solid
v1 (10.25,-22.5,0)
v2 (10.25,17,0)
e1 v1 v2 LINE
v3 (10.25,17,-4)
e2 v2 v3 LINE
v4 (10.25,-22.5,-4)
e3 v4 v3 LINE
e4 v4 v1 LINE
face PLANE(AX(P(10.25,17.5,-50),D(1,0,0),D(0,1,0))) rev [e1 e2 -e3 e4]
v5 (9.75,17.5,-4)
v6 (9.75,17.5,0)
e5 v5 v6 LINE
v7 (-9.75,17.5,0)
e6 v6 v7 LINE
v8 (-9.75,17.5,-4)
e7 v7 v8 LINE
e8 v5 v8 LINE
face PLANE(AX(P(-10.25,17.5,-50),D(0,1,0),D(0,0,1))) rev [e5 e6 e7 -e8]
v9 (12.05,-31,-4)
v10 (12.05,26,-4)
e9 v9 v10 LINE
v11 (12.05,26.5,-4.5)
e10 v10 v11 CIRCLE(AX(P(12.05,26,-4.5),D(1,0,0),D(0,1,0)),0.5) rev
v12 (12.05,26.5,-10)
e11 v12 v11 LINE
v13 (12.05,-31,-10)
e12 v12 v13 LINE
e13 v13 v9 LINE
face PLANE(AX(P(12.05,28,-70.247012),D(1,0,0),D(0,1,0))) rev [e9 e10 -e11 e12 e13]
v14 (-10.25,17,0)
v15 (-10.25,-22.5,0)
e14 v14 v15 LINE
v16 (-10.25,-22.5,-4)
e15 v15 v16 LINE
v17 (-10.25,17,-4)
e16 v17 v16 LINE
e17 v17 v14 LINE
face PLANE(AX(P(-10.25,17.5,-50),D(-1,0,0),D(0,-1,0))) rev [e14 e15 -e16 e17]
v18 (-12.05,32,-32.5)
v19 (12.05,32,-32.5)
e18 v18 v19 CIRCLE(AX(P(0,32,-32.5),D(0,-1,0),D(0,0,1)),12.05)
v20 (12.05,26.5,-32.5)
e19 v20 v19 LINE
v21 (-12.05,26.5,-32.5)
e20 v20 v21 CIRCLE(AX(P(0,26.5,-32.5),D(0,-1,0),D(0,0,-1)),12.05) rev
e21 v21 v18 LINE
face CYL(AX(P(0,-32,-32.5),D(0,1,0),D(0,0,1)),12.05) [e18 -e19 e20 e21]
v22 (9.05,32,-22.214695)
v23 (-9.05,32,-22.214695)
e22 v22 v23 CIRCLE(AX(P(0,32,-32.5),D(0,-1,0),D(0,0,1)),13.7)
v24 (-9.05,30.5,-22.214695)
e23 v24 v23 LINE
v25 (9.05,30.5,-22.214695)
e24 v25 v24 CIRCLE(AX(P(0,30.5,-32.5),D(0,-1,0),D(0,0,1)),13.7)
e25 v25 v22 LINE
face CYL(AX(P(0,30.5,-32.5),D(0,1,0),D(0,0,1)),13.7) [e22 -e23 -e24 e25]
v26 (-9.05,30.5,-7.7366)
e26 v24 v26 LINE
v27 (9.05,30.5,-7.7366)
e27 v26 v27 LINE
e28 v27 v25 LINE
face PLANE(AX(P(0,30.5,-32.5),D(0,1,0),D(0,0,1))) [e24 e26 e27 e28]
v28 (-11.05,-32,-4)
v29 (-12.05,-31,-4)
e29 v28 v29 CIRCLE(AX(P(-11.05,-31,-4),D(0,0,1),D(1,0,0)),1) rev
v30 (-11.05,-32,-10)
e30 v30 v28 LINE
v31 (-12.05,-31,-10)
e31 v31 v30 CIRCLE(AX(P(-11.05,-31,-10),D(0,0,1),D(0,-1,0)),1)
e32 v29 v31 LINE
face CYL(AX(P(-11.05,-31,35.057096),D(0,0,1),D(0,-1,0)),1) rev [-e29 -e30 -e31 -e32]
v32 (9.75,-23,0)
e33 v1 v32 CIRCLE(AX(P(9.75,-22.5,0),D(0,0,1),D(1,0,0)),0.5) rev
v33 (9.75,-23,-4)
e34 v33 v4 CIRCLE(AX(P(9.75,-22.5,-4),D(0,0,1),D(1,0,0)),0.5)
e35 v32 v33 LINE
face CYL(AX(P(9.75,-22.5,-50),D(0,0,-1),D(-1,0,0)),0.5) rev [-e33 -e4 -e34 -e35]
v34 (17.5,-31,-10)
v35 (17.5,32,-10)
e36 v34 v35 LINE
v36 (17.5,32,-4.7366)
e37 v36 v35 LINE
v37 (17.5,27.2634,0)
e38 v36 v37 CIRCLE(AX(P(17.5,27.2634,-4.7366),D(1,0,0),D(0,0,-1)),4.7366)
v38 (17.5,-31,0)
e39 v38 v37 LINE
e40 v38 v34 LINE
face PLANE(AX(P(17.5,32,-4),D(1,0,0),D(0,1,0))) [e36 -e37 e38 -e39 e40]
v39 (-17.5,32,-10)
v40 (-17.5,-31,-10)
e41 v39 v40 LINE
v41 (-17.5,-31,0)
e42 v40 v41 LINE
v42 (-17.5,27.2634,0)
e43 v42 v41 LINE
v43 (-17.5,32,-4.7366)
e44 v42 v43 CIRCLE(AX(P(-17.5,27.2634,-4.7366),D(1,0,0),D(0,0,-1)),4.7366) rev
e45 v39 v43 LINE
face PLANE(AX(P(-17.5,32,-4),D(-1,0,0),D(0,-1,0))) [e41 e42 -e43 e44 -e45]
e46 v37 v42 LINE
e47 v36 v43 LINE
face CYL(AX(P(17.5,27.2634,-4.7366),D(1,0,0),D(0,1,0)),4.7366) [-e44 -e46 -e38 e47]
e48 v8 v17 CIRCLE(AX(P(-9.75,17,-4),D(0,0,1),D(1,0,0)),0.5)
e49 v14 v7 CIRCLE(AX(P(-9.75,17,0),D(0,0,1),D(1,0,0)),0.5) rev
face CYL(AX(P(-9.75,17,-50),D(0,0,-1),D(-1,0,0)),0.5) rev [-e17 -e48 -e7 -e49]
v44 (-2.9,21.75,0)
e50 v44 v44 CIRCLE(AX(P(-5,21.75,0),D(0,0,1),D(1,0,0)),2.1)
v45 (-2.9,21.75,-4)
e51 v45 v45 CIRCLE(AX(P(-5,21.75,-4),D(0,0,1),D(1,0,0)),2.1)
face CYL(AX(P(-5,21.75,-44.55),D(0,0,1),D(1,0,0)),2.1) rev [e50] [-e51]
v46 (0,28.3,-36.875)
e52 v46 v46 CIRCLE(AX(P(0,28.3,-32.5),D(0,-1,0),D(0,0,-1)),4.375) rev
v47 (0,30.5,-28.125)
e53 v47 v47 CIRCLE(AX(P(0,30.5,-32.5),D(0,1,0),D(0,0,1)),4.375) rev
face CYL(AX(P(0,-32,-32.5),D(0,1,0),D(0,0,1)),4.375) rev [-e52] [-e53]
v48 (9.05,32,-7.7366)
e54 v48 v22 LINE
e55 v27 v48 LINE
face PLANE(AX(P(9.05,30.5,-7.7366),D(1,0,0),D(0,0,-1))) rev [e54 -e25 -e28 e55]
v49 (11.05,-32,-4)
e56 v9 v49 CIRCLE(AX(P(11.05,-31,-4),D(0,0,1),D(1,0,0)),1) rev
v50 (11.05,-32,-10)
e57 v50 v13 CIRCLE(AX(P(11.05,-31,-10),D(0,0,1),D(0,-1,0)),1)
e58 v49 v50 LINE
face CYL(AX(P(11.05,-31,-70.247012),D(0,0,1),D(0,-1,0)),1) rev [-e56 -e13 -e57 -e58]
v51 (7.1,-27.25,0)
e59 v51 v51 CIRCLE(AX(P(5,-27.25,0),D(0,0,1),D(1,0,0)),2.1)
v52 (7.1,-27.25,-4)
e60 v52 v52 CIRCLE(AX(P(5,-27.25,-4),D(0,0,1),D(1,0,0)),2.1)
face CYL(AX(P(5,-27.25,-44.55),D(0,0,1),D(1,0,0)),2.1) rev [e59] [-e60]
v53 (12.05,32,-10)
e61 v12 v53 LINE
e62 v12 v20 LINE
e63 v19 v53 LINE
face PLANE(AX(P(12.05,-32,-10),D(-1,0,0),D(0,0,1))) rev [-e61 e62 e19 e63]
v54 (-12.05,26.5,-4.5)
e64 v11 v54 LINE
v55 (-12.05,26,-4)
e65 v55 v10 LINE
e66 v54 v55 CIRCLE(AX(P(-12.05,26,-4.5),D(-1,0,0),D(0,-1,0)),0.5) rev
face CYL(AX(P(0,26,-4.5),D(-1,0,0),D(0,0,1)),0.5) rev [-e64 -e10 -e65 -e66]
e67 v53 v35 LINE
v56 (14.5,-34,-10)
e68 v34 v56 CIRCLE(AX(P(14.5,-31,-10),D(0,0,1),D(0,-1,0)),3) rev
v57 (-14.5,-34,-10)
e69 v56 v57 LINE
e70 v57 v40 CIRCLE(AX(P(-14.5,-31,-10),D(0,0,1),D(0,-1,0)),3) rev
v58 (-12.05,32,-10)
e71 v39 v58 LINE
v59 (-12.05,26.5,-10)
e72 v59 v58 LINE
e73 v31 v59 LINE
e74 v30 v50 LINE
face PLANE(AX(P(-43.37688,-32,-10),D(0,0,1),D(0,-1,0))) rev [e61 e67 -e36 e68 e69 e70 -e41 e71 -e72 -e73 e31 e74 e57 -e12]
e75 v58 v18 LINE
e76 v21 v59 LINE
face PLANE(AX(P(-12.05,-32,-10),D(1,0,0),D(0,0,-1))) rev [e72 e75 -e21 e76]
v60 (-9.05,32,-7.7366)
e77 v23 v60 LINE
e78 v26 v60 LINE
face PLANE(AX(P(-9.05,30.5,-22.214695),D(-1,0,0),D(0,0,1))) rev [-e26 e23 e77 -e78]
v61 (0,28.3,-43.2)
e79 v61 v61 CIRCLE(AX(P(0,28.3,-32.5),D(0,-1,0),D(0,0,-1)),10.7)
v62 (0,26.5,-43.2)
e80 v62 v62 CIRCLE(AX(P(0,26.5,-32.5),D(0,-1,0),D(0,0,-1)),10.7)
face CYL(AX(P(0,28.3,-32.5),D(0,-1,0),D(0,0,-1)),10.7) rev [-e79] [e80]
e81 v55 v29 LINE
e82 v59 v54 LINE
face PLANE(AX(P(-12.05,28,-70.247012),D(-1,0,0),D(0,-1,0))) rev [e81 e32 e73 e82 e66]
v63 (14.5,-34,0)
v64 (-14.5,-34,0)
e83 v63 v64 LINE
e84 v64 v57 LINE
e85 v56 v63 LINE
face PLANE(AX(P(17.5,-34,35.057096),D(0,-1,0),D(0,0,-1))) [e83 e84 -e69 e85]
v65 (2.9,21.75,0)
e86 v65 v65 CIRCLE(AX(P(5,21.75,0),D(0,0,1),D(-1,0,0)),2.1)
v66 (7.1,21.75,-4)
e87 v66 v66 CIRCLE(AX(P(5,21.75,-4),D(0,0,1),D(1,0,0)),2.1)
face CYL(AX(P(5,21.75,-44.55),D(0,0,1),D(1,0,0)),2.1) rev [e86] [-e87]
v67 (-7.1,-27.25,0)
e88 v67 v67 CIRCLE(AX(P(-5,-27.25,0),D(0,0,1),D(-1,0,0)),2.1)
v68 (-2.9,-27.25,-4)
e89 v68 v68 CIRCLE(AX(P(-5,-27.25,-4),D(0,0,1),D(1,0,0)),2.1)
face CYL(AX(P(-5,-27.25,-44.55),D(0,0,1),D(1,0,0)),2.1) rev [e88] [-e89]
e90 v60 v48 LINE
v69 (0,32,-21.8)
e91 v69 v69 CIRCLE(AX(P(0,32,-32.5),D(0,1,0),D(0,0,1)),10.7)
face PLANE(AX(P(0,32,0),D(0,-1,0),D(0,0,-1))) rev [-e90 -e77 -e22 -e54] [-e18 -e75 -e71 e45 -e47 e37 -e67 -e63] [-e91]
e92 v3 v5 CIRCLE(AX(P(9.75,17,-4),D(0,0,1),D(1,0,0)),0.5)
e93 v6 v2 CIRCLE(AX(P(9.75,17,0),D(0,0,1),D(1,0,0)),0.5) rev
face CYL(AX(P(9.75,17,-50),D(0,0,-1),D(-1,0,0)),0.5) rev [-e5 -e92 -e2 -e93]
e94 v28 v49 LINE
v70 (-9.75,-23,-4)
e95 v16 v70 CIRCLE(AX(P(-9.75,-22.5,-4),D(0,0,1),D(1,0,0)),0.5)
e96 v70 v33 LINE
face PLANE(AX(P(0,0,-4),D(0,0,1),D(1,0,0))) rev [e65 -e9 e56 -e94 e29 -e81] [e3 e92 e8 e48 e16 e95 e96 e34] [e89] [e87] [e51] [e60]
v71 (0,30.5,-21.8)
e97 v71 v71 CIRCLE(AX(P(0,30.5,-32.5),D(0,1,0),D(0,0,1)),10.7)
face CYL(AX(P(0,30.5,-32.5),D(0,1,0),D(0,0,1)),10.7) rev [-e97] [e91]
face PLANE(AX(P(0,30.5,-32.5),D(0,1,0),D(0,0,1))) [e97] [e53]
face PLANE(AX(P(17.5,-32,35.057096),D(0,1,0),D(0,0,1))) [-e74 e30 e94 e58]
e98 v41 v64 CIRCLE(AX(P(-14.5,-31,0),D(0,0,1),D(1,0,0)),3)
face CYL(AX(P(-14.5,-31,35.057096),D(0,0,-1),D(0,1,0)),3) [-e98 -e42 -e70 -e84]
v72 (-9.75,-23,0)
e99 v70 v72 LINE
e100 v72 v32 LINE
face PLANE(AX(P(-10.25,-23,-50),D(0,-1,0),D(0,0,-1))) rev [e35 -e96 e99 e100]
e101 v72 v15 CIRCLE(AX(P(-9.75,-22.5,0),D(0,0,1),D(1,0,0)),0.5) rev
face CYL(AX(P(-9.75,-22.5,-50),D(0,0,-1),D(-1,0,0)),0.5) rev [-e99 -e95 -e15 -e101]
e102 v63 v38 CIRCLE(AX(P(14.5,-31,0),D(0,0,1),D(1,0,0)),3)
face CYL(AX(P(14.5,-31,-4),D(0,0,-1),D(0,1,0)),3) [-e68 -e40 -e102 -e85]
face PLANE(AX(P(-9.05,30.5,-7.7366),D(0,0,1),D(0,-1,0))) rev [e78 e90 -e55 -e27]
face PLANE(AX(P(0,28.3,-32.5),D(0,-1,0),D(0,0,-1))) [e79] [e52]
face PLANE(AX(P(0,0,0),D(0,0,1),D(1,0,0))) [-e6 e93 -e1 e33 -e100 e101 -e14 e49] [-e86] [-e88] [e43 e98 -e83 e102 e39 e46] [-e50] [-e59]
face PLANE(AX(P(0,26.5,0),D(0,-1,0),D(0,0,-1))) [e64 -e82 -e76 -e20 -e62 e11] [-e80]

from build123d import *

# Parameters (mm, degrees)
SKETCH1_W                    = 35
SKETCH1_H                    = 64
BASE_FLANGE1_DEPTH           = 4
EDGE_FLANGE1_STRIP_W         = 17.4732
EDGE_FLANGE1_STRIP_H         = 4
EDGE_FLANGE1_STRIP_CUT_DEPTH = 35
EDGE_FLANGE1_DEPTH           = 35
CUT_EXTRUDE1_DEPTH           = 62.889013565
CUT_EXTRUDE1_DEPTH_BACK      = 62.889013565
SKETCH10_W                   = 20.5
SKETCH10_H                   = 40.5
CUT_EXTRUDE2_DEPTH           = 84.079780934
CUT_EXTRUDE2_DEPTH_BACK      = 84.079780934
SKETCH11_R                   = 4.375
FILLET1_R                    = 17
CUT_EXTRUDE3_DEPTH           = 84.079780934
CUT_EXTRUDE3_DEPTH_BACK      = 84.079780934
CUT_EXTRUDE4_DEPTH           = 58.575624182
CUT_EXTRUDE4_DEPTH_BACK      = 58.575624182
SKETCH14_R                   = 2.1
SKETCH16_R                   = 10.7
CUT_EXTRUDE5_DEPTH           = 0.3
SKETCH21_W                   = 5.45
SKETCH21_H                   = 60
BOSS_EXTRUDE1_DEPTH          = 6
SKETCH23_W                   = 35
SKETCH23_H                   = 2
BOSS_EXTRUDE2_DEPTH          = 10
FILLET2_R                    = 3
FILLET3_R                    = 0.5
FILLET4_R                    = 1
DELETEFACE1_START            = -12.05
DELETEFACE1_DEPTH            = 24.1
MOVE_FACE2_BY                = 1.5
FILLET5_R                    = 0.5
SKETCH26_R                   = 10.7
CUT_EXTRUDE6_DEPTH           = 1.5


# Read off the part's stored shape, not the designer's step: DeleteFace1
# Sheet-metal steps are written as plain solids
with BuildPart() as part:
    # Sketch1 → Base-Flange1 (new body)
    with BuildSketch(Plane.XY):
        Rectangle(SKETCH1_W, SKETCH1_H)
    extrude(amount=-BASE_FLANGE1_DEPTH)

    # Edge-Flange1 strip (across the edge) → Edge-Flange1 strip cut (cut)
    with BuildSketch(Plane(origin=(-17.5, 32, -4), x_dir=(0, -1, 0), z_dir=(1, 0, 0))):
        with Locations((-4, -2)):
            Rectangle(EDGE_FLANGE1_STRIP_W, EDGE_FLANGE1_STRIP_H)
    extrude(amount=EDGE_FLANGE1_STRIP_CUT_DEPTH, mode=Mode.SUBTRACT)

    # Edge-Flange1 section (across the edge) → Edge-Flange1 (add)
    with BuildSketch(Plane(origin=(-17.5, 32, -4), x_dir=(0, -1, 0), z_dir=(1, 0, 0))):
        with BuildLine():
            Line((0, 0.7366), (0, 46))
            Line((0, 46), (4, 46))
            Line((4, 46), (4, 0.7366))
            ThreePointArc((4, 0.7366), (4.215745145, 0.215745145), (4.7366, 0))
            Line((4.7366, 0), (4.7366, -4))
            ThreePointArc((4.7366, -4), (1.38731802, -2.61268198), (0, 0.7366))
        make_face()
    extrude(amount=EDGE_FLANGE1_DEPTH)

    # Sketch10 → Cut-Extrude1 (cut, two sides: drawn at the far end of the back side and taken through both)
    with BuildSketch(Plane.XY.offset(-CUT_EXTRUDE1_DEPTH_BACK)):
        with Locations((0, -2.75)):
            Rectangle(SKETCH10_W, SKETCH10_H)
    extrude(amount=CUT_EXTRUDE1_DEPTH + CUT_EXTRUDE1_DEPTH_BACK, mode=Mode.SUBTRACT)

    # Sketch11 → Cut-Extrude2 (cut, two sides: drawn at the far end of the back side and taken through both)
    with BuildSketch(Plane(origin=(0, 32, 0), x_dir=(1, 0, 0), z_dir=(0, 1, 0)).offset(-CUT_EXTRUDE2_DEPTH_BACK)):
        with Locations(Location((0, 32.5, 0), (0, 0, 270))):
            Circle(SKETCH11_R)
    extrude(amount=CUT_EXTRUDE2_DEPTH + CUT_EXTRUDE2_DEPTH_BACK, mode=Mode.SUBTRACT)

    # Fillet1
    fillet1_edges = [part.edges().sort_by_distance(p)[0] for p in [
        (-17.5, 30, -50),
        (17.5, 30, -50),
    ]]
    fillet(fillet1_edges, radius=FILLET1_R)

    # Sketch13 → Cut-Extrude3 (cut, two sides: drawn at the far end of the back side and taken through both)
    with BuildSketch(Plane(origin=(0, 32, 0), x_dir=(1, 0, 0), z_dir=(0, 1, 0)).offset(-CUT_EXTRUDE3_DEPTH_BACK)):
        with BuildLine():
            Line((12.05, 10), (40.591208969, 10))
            Line((40.591208969, 10), (40.591208969, 59.144369897))
            Line((40.591208969, 59.144369897), (-43.376880173, 59.144369897))
            Line((-43.376880173, 59.144369897), (-43.376880173, 10))
            Line((-43.376880173, 10), (-12.05, 10))
            Line((-12.05, 10), (-12.05, 32.499999826))
            ThreePointArc((-12.05, 32.499999826), (0, 44.55), (12.05, 32.499999826))
            Line((12.05, 32.499999826), (12.05, 10))
        make_face()
    extrude(amount=CUT_EXTRUDE3_DEPTH + CUT_EXTRUDE3_DEPTH_BACK, mode=Mode.SUBTRACT)

    # Sketch14 → Cut-Extrude4 (cut, two sides: drawn at the far end of the back side and taken through both)
    with BuildSketch(Plane.XY.offset(-CUT_EXTRUDE4_DEPTH_BACK)):
        with Locations((-5, 21.75)):
            Circle(SKETCH14_R)
        with Locations((-5, -27.25)):
            Circle(SKETCH14_R)
        with Locations((5, -27.25)):
            Circle(SKETCH14_R)
        with Locations((5, 21.75)):
            Circle(SKETCH14_R)
    extrude(amount=CUT_EXTRUDE4_DEPTH + CUT_EXTRUDE4_DEPTH_BACK, mode=Mode.SUBTRACT)

    # Sketch16 → Cut-Extrude5 (cut)
    with BuildSketch(Plane.XZ.offset(-28)):
        with Locations(Location((0, -32.5, 0), (0, 0, 270))):
            Circle(SKETCH16_R)
    extrude(amount=-CUT_EXTRUDE5_DEPTH, mode=Mode.SUBTRACT)

    # Sketch21 → Boss-Extrude1 (add)
    with BuildSketch(Plane(origin=(0, 0, -4), x_dir=(-1, 0, 0), z_dir=(0, 0, -1))):
        with Locations((-14.775, -2)):
            Rectangle(SKETCH21_W, SKETCH21_H)
        with Locations((14.775, -2)):
            Rectangle(SKETCH21_W, SKETCH21_H)
    extrude(amount=BOSS_EXTRUDE1_DEPTH)

    # Sketch23 → Boss-Extrude2 (add)
    with BuildSketch(Plane(origin=(0, 0, -10), x_dir=(-1, 0, 0), z_dir=(0, 0, -1))):
        with Locations((0, -33)):
            Rectangle(SKETCH23_W, SKETCH23_H)
    extrude(amount=-BOSS_EXTRUDE2_DEPTH)

    # Fillet2
    fillet2_edges = [part.edges().sort_by_distance(p)[0] for p in [
        (-17.5, -34, -5),
        (17.5, -34, -5),
    ]]
    fillet(fillet2_edges, radius=FILLET2_R)

    # Fillet3
    fillet3_edges = [part.edges().sort_by_distance(p)[0] for p in [
        (10.25, 17.5, -2),
        (10.25, -23, -2),
        (-10.25, -23, -2),
        (-10.25, 17.5, -2),
    ]]
    fillet(fillet3_edges, radius=FILLET3_R)

    # Fillet4
    fillet4_edges = [part.edges().sort_by_distance(p)[0] for p in [
        (12.05, -32, -7),
        (-12.05, -32, -7),
    ]]
    fillet(fillet4_edges, radius=FILLET4_R)

    # DeleteFace1 outline → DeleteFace1 (cut)
    with BuildSketch(Plane.YZ.offset(DELETEFACE1_START)):
        with BuildLine():
            ThreePointArc((27.2634, -4), (27.784254855, -4.215745145), (28, -4.7366))
            Line((28, -4.7366), (28, -4))
            Line((28, -4), (27.2634, -4))
        make_face()
    extrude(amount=DELETEFACE1_DEPTH, mode=Mode.SUBTRACT)

    # Move Face2: a face moved outward by 1.5
    extrude(part.faces().sort_by_distance((0, 28, -16.973459017))[0], amount=MOVE_FACE2_BY, dir=(0, -1, 0))

    # Fillet5
    fillet5_edges = [part.edges().sort_by_distance(p)[0] for p in [
        (0, 26.5, -4),
    ]]
    fillet(fillet5_edges, radius=FILLET5_R)

    # Sketch26 → Cut-Extrude6 (cut)
    with BuildSketch(Plane(origin=(0, 32, 0), x_dir=(1, 0, 0), z_dir=(0, 1, 0))):
        with Locations(Location((0, 32.5, 0), (0, 0, 90))):
            Circle(SKETCH26_R)
        with BuildLine():
            Line((-9.05, 22.214694949), (-9.05, 7.7366))
            Line((-9.05, 7.7366), (9.05, 7.7366))
            Line((9.05, 7.7366), (9.05, 22.214694949))
            ThreePointArc((9.05, 22.214694949), (0, 18.8), (-9.05, 22.214694949))
        make_face()
    extrude(amount=-CUT_EXTRUDE6_DEPTH, mode=Mode.SUBTRACT)


solid = part.part
